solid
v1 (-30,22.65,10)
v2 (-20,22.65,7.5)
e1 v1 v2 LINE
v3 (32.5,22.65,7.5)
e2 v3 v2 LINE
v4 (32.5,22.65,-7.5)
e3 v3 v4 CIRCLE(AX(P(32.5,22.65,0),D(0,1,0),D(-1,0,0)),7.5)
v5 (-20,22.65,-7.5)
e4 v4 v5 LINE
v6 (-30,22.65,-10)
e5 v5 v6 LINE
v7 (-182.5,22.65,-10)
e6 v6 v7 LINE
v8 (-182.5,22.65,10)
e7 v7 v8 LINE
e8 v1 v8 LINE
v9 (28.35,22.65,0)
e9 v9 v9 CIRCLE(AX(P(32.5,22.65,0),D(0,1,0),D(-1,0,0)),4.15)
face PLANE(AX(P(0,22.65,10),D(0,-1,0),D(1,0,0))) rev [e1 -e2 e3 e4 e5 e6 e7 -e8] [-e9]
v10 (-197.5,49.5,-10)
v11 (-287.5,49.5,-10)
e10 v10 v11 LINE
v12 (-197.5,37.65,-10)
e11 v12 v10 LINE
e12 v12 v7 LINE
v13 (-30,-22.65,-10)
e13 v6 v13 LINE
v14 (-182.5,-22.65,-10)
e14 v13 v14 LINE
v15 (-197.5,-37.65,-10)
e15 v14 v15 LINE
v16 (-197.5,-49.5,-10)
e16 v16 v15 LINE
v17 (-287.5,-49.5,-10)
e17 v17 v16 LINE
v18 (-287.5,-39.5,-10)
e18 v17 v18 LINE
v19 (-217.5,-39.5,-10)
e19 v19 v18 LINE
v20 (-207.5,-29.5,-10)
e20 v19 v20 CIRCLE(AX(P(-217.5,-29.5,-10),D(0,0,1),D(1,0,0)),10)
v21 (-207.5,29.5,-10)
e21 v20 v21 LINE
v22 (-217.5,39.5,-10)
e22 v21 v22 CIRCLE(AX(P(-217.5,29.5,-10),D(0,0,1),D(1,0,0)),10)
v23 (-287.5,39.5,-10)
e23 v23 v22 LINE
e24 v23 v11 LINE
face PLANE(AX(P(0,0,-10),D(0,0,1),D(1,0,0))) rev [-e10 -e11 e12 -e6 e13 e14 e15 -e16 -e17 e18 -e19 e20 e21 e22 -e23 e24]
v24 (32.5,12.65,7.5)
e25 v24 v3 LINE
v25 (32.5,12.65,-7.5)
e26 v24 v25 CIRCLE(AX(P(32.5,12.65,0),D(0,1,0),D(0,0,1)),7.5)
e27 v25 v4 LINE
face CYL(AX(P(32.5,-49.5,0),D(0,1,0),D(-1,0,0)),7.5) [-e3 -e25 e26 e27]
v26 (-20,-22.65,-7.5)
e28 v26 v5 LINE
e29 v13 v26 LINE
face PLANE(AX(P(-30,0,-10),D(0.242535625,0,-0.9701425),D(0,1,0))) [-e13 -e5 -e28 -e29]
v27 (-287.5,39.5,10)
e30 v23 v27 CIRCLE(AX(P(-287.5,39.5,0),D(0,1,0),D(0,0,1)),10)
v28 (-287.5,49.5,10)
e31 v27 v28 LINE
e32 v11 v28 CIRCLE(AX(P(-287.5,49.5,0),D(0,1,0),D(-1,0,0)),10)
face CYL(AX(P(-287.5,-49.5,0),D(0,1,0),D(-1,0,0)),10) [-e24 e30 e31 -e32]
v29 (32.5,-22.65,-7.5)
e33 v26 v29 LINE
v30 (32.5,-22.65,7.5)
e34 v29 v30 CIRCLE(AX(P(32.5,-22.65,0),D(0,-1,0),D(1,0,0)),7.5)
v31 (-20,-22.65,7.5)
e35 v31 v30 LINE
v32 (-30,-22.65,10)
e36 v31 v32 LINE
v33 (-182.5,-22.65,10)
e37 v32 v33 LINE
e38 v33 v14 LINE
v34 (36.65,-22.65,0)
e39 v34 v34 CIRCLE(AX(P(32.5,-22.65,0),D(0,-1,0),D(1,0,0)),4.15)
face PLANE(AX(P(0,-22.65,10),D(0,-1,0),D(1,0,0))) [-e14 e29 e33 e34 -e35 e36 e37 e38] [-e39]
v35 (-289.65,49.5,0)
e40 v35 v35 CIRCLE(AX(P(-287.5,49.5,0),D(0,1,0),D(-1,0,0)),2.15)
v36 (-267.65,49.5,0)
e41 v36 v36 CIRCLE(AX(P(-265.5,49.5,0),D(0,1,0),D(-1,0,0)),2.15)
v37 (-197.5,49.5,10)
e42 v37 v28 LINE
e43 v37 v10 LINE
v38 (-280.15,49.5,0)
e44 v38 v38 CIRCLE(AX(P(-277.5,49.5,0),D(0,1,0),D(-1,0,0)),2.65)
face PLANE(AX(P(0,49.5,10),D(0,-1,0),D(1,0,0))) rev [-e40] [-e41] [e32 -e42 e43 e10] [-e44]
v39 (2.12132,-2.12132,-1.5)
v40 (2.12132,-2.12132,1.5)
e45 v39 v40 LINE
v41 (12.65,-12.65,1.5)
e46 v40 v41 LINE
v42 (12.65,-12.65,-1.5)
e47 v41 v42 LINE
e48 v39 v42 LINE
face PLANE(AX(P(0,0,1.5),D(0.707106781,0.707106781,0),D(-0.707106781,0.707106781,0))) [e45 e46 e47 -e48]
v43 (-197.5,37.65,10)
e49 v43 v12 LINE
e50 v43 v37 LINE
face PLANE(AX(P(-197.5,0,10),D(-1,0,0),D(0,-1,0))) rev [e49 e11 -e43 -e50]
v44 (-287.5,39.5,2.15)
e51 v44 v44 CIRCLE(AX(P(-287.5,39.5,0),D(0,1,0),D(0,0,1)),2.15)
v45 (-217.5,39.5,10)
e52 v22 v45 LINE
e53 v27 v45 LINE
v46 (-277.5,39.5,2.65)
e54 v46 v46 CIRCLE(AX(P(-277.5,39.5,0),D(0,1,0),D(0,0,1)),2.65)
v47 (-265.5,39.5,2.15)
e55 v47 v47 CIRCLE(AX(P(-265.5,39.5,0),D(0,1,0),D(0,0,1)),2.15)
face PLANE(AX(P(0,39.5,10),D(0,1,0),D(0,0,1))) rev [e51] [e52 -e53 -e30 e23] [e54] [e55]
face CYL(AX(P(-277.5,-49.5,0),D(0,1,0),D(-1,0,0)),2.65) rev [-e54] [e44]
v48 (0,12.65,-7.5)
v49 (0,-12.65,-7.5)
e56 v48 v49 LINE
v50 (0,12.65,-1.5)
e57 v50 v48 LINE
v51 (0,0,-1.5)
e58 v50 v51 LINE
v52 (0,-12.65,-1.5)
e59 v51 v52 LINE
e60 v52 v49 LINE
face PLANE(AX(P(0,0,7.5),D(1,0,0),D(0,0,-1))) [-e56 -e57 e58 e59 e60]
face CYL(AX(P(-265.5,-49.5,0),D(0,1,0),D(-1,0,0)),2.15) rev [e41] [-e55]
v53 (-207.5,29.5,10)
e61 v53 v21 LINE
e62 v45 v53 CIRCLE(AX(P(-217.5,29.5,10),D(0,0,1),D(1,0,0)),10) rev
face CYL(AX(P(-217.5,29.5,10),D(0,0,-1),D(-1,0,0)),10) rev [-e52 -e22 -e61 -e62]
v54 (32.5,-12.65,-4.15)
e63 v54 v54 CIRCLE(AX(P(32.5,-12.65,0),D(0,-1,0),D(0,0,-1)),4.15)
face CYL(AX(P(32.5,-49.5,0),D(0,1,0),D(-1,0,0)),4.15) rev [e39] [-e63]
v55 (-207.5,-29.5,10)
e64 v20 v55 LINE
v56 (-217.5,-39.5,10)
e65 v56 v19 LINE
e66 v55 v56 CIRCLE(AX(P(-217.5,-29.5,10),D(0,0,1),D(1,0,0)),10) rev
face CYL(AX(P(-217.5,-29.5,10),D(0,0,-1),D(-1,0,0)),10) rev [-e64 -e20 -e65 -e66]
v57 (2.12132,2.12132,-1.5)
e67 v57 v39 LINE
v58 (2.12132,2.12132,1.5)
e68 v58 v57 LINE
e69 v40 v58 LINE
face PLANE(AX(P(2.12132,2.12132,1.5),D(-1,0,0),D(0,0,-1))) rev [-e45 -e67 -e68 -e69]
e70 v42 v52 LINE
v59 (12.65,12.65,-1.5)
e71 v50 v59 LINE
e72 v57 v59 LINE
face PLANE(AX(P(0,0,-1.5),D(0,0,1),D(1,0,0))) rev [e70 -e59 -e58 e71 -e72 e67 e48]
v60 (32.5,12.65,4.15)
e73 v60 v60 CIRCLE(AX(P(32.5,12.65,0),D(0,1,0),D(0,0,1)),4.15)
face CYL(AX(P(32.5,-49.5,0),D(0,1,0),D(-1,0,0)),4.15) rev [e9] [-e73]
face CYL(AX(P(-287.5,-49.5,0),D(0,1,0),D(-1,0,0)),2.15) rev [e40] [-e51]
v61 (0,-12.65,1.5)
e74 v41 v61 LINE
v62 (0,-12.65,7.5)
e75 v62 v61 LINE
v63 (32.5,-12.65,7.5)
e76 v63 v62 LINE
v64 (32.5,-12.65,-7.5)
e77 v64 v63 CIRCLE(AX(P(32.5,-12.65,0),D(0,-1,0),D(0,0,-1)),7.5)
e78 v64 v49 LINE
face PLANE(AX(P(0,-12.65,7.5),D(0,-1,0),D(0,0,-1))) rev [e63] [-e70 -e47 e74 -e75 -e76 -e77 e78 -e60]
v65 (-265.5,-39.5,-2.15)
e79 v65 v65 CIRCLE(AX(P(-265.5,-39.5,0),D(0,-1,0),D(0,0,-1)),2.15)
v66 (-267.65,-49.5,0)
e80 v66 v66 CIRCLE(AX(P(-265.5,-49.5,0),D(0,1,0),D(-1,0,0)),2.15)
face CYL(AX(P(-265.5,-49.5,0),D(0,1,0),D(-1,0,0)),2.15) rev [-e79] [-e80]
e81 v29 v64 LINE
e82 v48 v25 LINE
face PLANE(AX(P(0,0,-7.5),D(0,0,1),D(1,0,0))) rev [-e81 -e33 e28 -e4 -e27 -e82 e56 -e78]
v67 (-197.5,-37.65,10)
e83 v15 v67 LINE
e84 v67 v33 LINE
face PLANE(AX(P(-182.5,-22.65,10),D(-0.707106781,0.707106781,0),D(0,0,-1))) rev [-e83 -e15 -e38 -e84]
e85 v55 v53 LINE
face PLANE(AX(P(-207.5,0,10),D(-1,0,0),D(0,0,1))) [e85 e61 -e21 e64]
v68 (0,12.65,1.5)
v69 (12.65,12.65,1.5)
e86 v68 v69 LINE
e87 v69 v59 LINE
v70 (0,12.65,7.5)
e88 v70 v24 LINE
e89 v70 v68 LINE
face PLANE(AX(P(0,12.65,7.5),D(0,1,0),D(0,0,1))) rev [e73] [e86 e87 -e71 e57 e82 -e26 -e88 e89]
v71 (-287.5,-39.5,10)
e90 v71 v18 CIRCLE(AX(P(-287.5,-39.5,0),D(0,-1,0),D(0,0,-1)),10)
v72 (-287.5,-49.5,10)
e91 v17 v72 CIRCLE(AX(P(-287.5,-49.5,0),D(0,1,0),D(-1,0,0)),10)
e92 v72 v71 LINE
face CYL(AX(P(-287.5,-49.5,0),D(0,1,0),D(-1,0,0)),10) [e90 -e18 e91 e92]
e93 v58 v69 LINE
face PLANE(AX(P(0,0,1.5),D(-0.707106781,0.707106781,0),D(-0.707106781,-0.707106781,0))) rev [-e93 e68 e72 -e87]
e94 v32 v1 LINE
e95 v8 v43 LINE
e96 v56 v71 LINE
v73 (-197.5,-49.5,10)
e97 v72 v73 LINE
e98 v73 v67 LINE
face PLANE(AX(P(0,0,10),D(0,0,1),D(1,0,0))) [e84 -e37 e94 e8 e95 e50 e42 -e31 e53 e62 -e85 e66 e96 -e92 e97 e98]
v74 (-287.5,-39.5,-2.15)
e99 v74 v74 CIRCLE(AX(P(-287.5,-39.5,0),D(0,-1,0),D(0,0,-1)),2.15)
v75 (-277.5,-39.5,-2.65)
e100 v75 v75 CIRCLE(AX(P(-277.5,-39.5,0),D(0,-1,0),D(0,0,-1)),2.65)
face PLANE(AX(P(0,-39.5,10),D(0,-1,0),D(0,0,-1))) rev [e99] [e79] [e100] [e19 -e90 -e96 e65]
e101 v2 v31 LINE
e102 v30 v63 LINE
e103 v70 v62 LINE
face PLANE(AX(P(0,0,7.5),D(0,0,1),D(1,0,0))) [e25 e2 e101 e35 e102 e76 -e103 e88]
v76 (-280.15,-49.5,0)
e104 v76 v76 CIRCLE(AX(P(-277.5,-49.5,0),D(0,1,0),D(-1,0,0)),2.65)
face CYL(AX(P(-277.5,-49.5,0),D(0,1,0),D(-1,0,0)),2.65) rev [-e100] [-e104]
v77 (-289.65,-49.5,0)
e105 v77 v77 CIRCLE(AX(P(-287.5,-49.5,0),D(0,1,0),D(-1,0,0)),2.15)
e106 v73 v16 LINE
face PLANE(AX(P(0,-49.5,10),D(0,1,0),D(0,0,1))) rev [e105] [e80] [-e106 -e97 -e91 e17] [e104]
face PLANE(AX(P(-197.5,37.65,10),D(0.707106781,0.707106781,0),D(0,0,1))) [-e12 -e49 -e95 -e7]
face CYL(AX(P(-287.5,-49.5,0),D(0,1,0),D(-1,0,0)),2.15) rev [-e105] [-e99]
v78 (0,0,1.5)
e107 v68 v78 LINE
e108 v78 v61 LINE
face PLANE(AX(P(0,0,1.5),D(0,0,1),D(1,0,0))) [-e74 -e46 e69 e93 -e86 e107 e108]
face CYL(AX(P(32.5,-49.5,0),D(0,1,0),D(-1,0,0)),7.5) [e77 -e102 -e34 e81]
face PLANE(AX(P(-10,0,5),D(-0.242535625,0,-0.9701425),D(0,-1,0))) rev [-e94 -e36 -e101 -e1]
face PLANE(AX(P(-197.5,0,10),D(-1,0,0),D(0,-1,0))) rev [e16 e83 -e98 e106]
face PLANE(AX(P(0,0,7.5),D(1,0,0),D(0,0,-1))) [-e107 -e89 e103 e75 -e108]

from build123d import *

# Parameters (mm, degrees)
SKETCH_2_W          = 187.5
SKETCH_2_H          = 45.3
EXTRUDE_1_DEPTH     = 10
EXTRUDE_2_DEPTH     = 7.5
CHAMFER_1_SIZE      = 20
CHAMFER_1_SIZE_2    = 5
CHAMFER_2_SIZE      = 5
CHAMFER_2_SIZE_2    = 20
EXTRUDE_3_DEPTH     = 1.5
CHAMFER_3_SIZE      = 3
CUT_EXTRUDE_1_DEPTH = 314.699298692
CUT_EXTRUDE_2_DEPTH = 307.287238552
CHAMFER_4_SIZE      = 15
FILLET_1_R          = 10


with BuildPart() as part:
    # 草图2 → 凸台-拉伸1 (new, symmetric)
    with BuildSketch(Plane.XY):
        with Locations((-103.75, 0)):
            Rectangle(SKETCH_2_W, SKETCH_2_H)
        Polygon((-297.5, 49.5), (-297.5, 39.5), (-207.5, 39.5), (-207.5, -39.5), (-297.5, -39.5), (-297.5, -49.5), (-197.5, -49.5), (-197.5, 49.5), align=None)
    extrude(amount=EXTRUDE_1_DEPTH, both=True)

    # 草图2<3> → 凸台-拉伸2 (add, symmetric)
    with BuildSketch(Plane.XY):
        Polygon((40, -22.65), (40, -12.65), (0, -12.65), (0, 12.65), (40, 12.65), (40, 22.65), (-10, 22.65), (-10, -22.65), align=None)
    extrude(amount=EXTRUDE_2_DEPTH, both=True)

    # 倒角1
    # the kernel refuses this chamfer: 20, 5 mm, written as the material it takes off along each edge
    with BuildSketch(Plane(origin=(-10, -74.592549995, 10), x_dir=(-0.9999563942249224, 0, 0.00933861064031752), z_dir=(0, 1, 0))) as chamfer_1_piece_1_section:
        Polygon((CHAMFER_1_SIZE * 0.999956394225, -CHAMFER_1_SIZE * 0.00933861064032), (-CHAMFER_1_SIZE_2 * 0.00933861064032, -CHAMFER_1_SIZE_2 * 0.999956394225), (0, 0), align=None)
    chamfer_1_piece_1 = extrude(amount=149.185099991, mode=Mode.PRIVATE)
    chamfer_1_piece_1 = split(chamfer_1_piece_1, bisect_by=Plane(origin=(-18.245866107, 0, 7.5), z_dir=(0, 0, 1)), keep=Keep.TOP, mode=Mode.PRIVATE)
    add(chamfer_1_piece_1, mode=Mode.SUBTRACT)

    # 倒角2
    # the kernel refuses this chamfer: 20, 5 mm, written as the material it takes off along each edge
    with BuildSketch(Plane(origin=(-10, -74.592549995, -10), x_dir=(0.14778356633657133, 0, 0.9890197255468893), z_dir=(0, 1, 0))) as chamfer_2_piece_1_section:
        Polygon((CHAMFER_2_SIZE * 0.989019725547, -CHAMFER_2_SIZE * 0.147783566337), (-CHAMFER_2_SIZE_2 * 0.147783566337, -CHAMFER_2_SIZE_2 * 0.989019725547), (0, 0), align=None)
    chamfer_2_piece_1 = extrude(amount=149.185099991, mode=Mode.PRIVATE)
    chamfer_2_piece_1 = split(chamfer_2_piece_1, bisect_by=Plane(origin=(-18.245866107, 0, -7.5), z_dir=(0, 0, -1)), keep=Keep.TOP, mode=Mode.PRIVATE)
    add(chamfer_2_piece_1, mode=Mode.SUBTRACT)

    # 草图2<5> → 凸台-拉伸3 (add, symmetric)
    with BuildSketch(Plane.XY):
        Polygon((12.65, 12.65), (0, 12.65), (0, 0), align=None)
        Polygon((12.65, -12.65), (0, 0), (0, -12.65), align=None)
    extrude(amount=EXTRUDE_3_DEPTH, both=True)

    # 倒角3
    chamfer_3_edges = [part.edges().sort_by_distance(p)[0] for p in [
        (0, 0, 0),
    ]]
    chamfer(chamfer_3_edges, length=CHAMFER_3_SIZE)

    # 草图3 → 切除-拉伸1 (cut, through all)
    with BuildSketch(Plane(origin=(0, 49.5, 0), x_dir=(1, 0, 0), z_dir=(0, 1, 0))):
        with BuildLine():
            ThreePointArc((-297.5, 0), (-294.571067812, 7.071067812), (-287.5, 10))
            Line((-287.5, 10), (-297.5, 10))
            Line((-297.5, 10), (-297.5, 0))
        make_face()
        with BuildLine():
            Line((-297.5, -10), (-287.5, -10))
            ThreePointArc((-287.5, -10), (-294.571067812, -7.071067812), (-297.5, 0))
            Line((-297.5, 0), (-297.5, -10))
        make_face()
        with BuildLine():
            ThreePointArc((-289.65, 0), (-287.5, -2.15), (-285.35, 0))
            Line((-285.35, 0), (-289.65, 0))
        make_face()
        with BuildLine():
            Line((-289.65, 0), (-285.35, 0))
            ThreePointArc((-285.35, 0), (-287.5, 2.15), (-289.65, 0))
        make_face()
        with BuildLine():
            ThreePointArc((-280.15, 0), (-277.5, -2.65), (-274.85, 0))
            Line((-274.85, 0), (-280.15, 0))
        make_face()
        with BuildLine():
            Line((-280.15, 0), (-274.85, 0))
            ThreePointArc((-274.85, 0), (-277.5, 2.65), (-280.15, 0))
        make_face()
        with BuildLine():
            ThreePointArc((-267.65, 0), (-265.5, -2.15), (-263.35, 0))
            Line((-263.35, 0), (-267.65, 0))
        make_face()
        with BuildLine():
            Line((-267.65, 0), (-263.35, 0))
            ThreePointArc((-263.35, 0), (-265.5, 2.15), (-267.65, 0))
        make_face()
    extrude(amount=-CUT_EXTRUDE_1_DEPTH, mode=Mode.SUBTRACT)

    # 草图4 → 切除-拉伸2 (cut, through all)
    with BuildSketch(Plane(origin=(0, 22.65, 0), x_dir=(1, 0, 0), z_dir=(0, 1, 0))):
        with BuildLine():
            ThreePointArc((28.35, 0), (32.5, -4.15), (36.65, 0))
            Line((36.65, 0), (28.35, 0))
        make_face()
        with BuildLine():
            Line((28.35, 0), (36.65, 0))
            ThreePointArc((36.65, 0), (32.5, 4.15), (28.35, 0))
        make_face()
        with BuildLine():
            ThreePointArc((32.5, 7.5), (37.803300859, 5.303300859), (40, 0))
            Line((40, 0), (40, 7.5))
            Line((40, 7.5), (32.5, 7.5))
        make_face()
        with BuildLine():
            Line((40, -7.5), (40, 0))
            ThreePointArc((40, 0), (37.80330088, -5.303300838), (32.500000061, -7.5))
            Line((32.500000061, -7.5), (40, -7.5))
        make_face()
    extrude(amount=-CUT_EXTRUDE_2_DEPTH, mode=Mode.SUBTRACT)

    # 倒角4
    chamfer_4_edges = [part.edges().sort_by_distance(p)[0] for p in [
        (-197.5, -22.65, 0),
        (-197.5, 22.65, 0),
    ]]
    chamfer(chamfer_4_edges, length=CHAMFER_4_SIZE)

    # 圆角1
    fillet_1_edges = [part.edges().sort_by_distance(p)[0] for p in [
        (-207.5, -39.5, 0),
        (-207.5, 39.5, 0),
    ]]
    fillet(fillet_1_edges, radius=FILLET_1_R)


solid = part.part
